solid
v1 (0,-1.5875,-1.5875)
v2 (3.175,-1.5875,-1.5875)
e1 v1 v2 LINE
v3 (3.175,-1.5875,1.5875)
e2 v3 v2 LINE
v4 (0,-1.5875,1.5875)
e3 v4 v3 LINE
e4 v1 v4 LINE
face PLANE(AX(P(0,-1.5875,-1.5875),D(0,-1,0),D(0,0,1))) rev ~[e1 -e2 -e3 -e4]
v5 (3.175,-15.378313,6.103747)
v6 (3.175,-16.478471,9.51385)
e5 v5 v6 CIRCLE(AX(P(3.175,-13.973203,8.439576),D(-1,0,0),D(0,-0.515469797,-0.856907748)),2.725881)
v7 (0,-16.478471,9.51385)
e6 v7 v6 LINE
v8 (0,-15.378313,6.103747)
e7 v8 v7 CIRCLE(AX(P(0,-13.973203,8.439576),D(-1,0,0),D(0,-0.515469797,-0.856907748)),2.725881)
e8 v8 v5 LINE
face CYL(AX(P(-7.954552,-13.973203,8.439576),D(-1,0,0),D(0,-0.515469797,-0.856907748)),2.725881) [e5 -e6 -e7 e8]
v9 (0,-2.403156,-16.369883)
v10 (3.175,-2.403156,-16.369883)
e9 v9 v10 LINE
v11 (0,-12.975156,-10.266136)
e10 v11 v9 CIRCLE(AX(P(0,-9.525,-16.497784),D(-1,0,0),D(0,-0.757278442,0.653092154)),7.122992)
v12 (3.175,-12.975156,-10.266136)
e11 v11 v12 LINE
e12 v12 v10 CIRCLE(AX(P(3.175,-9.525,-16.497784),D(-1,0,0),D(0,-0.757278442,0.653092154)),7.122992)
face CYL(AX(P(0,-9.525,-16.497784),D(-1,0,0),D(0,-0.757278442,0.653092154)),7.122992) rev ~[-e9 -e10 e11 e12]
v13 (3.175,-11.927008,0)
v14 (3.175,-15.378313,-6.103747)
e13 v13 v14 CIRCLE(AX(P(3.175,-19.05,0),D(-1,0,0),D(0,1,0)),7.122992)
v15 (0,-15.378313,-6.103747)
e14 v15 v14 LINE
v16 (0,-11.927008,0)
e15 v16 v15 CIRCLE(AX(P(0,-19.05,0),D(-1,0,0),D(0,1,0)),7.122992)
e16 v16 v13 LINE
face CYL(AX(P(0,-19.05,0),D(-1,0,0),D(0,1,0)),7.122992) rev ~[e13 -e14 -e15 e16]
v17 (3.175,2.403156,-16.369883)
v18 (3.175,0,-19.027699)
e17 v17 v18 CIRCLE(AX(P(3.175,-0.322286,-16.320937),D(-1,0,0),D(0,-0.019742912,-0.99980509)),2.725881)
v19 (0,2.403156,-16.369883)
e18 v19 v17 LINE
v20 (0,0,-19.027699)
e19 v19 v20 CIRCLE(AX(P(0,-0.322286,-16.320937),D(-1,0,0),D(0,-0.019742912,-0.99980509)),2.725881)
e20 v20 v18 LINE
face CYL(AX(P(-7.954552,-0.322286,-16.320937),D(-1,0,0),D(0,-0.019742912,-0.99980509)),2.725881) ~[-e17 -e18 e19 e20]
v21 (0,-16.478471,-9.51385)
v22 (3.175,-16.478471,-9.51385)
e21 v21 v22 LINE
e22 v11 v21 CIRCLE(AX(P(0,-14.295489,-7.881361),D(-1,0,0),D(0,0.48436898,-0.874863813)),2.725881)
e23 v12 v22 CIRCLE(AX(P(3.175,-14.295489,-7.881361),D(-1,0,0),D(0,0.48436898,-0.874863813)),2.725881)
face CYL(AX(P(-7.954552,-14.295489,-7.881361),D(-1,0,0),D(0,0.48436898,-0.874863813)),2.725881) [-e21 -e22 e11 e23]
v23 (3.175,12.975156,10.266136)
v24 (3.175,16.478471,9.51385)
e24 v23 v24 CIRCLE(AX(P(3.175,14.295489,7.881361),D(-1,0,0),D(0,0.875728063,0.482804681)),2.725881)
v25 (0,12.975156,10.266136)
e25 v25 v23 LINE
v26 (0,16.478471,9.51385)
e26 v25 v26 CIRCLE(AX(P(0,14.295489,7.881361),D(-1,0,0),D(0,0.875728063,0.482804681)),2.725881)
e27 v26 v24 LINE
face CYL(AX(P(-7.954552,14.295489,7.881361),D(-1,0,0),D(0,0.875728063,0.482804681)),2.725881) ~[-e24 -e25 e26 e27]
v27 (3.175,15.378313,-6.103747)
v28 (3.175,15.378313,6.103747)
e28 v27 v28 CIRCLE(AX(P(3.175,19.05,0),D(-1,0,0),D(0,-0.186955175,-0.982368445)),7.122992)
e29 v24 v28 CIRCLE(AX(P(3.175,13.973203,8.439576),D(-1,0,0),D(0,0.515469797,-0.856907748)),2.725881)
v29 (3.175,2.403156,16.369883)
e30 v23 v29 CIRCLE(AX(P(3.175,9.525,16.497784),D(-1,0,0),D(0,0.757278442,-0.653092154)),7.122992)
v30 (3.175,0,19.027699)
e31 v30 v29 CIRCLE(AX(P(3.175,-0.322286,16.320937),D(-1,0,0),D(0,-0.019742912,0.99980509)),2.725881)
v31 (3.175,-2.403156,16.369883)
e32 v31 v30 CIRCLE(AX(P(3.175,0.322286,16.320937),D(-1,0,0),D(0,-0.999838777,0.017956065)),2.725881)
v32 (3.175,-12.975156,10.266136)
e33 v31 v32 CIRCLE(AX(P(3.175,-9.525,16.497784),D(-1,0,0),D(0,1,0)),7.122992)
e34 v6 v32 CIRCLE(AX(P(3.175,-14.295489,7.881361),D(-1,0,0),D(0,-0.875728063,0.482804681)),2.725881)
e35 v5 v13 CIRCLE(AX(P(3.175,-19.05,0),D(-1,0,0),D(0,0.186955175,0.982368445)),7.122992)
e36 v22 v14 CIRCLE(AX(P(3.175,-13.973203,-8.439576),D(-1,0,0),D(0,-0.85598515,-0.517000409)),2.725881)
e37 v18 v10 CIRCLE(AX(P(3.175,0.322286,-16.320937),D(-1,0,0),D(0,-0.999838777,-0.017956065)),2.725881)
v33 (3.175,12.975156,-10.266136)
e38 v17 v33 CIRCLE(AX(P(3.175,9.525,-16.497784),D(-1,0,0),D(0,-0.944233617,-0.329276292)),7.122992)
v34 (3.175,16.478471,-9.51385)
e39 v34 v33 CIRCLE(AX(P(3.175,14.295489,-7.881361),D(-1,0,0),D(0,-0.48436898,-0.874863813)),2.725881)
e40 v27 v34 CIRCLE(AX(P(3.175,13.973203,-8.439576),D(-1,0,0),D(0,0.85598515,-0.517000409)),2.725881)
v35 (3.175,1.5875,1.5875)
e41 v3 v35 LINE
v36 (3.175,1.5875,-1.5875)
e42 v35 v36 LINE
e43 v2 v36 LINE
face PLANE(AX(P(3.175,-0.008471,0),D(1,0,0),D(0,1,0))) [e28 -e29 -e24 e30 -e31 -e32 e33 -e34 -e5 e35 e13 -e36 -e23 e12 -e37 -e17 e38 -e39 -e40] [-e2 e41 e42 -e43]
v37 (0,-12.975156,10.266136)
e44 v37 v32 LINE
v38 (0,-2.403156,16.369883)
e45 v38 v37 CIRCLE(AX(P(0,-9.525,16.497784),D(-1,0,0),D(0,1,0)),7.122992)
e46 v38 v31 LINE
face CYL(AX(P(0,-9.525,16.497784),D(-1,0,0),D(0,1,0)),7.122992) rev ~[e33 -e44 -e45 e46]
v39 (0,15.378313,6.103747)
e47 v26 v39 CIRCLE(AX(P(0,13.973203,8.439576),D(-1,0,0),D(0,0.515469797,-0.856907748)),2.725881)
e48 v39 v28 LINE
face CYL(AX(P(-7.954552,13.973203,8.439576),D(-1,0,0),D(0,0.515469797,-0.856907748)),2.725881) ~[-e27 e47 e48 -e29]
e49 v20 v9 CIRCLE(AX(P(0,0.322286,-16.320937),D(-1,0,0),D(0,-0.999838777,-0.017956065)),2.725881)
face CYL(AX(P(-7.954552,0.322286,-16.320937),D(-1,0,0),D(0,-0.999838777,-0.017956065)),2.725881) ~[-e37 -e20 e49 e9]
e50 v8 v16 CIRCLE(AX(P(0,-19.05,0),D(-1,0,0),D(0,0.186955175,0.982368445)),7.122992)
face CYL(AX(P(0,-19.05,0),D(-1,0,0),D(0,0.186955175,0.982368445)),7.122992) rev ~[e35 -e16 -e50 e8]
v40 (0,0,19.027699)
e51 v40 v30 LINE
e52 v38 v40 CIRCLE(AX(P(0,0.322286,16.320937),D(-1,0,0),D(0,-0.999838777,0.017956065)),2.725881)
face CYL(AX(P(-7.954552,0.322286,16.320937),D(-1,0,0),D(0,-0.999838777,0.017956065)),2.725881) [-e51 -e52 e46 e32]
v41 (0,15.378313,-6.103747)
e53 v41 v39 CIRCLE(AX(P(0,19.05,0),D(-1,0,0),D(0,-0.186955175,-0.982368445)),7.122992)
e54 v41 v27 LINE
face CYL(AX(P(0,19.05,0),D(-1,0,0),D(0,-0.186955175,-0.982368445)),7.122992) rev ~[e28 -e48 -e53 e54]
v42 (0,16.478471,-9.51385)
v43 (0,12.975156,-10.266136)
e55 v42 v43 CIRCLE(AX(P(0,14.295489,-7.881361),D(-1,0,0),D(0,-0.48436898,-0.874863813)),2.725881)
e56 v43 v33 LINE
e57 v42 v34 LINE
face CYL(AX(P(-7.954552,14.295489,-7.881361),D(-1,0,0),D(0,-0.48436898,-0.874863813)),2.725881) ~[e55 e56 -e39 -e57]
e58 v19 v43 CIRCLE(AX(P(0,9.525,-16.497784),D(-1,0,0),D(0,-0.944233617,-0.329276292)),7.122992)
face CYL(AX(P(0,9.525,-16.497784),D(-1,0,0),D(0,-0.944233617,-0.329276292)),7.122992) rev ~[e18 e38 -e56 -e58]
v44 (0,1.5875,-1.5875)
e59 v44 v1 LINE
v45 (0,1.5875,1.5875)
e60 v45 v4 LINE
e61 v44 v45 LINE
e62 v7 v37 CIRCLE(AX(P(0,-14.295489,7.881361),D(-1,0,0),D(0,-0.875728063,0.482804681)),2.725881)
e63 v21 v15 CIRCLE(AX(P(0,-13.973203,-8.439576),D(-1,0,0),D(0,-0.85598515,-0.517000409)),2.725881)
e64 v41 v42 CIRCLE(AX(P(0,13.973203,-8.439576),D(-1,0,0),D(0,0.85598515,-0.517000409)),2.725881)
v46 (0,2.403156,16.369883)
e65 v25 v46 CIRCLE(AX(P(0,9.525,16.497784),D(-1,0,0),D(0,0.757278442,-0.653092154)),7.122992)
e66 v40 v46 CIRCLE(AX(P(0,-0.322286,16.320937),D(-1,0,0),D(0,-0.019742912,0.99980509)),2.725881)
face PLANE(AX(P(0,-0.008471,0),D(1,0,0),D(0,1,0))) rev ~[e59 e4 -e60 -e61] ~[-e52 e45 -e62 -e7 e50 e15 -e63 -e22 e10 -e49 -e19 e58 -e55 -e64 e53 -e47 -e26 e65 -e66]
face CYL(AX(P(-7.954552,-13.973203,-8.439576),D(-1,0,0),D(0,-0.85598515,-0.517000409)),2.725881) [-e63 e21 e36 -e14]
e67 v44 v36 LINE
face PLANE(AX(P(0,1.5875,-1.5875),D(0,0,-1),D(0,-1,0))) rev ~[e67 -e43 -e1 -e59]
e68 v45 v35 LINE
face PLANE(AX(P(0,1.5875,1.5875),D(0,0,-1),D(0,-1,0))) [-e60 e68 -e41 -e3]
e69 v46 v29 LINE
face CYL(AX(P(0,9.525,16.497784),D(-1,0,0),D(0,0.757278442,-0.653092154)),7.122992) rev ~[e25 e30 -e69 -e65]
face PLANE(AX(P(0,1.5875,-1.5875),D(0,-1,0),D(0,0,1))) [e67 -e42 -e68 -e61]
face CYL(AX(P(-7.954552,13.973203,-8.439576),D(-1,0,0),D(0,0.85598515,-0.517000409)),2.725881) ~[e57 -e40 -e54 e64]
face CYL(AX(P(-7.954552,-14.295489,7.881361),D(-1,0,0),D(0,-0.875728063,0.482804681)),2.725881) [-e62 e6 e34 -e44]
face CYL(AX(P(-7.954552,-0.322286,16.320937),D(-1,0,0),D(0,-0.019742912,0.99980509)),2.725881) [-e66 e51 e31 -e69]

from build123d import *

# Parameters (mm, degrees)
F1_DEPTH    = 3.175
F2_W        = 3.175
F2_H        = 3.175
F3_DEPTH    = 25.4
F4_T1_DEPTH = 19.0841031127


# Not quite as in the source:
# - a fillet or chamfer that OpenCascade refuses, or shapes differently, is made with other operations: its cross-section is extruded or revolved along the edge and cut away or added


with BuildPart() as f1:
    # F0 (on Right) → F1 (new body)
    with BuildSketch(Plane.YZ):
        with BuildLine():
            ThreePointArc((17.7183197491, -6.9974027515), (11.9270078227, 0), (17.7183197491, 6.9974027515))
            ThreePointArc((17.7183197491, 6.9974027515), (16.4977839421, 9.525), (14.9190884179, 11.8458136394))
            ThreePointArc((14.9190884179, 11.8458136394), (5.9635039114, 10.3290917656), (2.7992313312, 18.8432163909))
            ThreePointArc((2.7992313312, 18.8432163909), (0, 19.05), (-2.7992313312, 18.8432163909))
            ThreePointArc((-2.7992313312, 18.8432163909), (-2.5020157635, 17.6871997533), (-2.4020078227, 16.4977839421))
            ThreePointArc((-2.4020078227, 16.4977839421), (-7.0435721899, 9.8209932773), (-14.9190884179, 11.8458136394))
            ThreePointArc((-14.9190884179, 11.8458136394), (-16.4977839421, 9.525), (-17.7183197491, 6.9974027515))
            ThreePointArc((-17.7183197491, 6.9974027515), (-13.5626251464, 4.5415564264), (-11.9270078227, 0))
            ThreePointArc((-11.9270078227, 0), (-13.5626251464, -4.5415564264), (-17.7183197491, -6.9974027515))
            ThreePointArc((-17.7183197491, -6.9974027515), (-16.4977839421, -9.525), (-14.9190884179, -11.8458136394))
            ThreePointArc((-14.9190884179, -11.8458136394), (-7.0435721899, -9.8209932773), (-2.4020078227, -16.4977839421))
            ThreePointArc((-2.4020078227, -16.4977839421), (-2.5020157635, -17.6871997533), (-2.7992313312, -18.8432163909))
            ThreePointArc((-2.7992313312, -18.8432163909), (0, -19.05), (2.7992313312, -18.8432163909))
            ThreePointArc((2.7992313312, -18.8432163909), (5.9635039114, -10.3290917656), (14.9190884179, -11.8458136394))
            ThreePointArc((14.9190884179, -11.8458136394), (16.4977839421, -9.525), (17.7183197491, -6.9974027515))
        make_face()
    extrude(amount=F1_DEPTH)

    # F2 (on face) → F3 (cut)
    with BuildSketch(Plane(origin=(0, 0, 0), x_dir=(0, -1, 0), z_dir=(-1, 0, 0))):
        Rectangle(F2_W, F2_H)
    extrude(amount=-F3_DEPTH, mode=Mode.SUBTRACT)

    # F4: fillet of radius 2.7258813335 on 12 edges, made by hand

    # F4_s2 → F4_t1 (cut)
    with BuildSketch(Plane.YZ.offset(-7.9545515563)):
        with BuildLine():
            ThreePointArc((-16.6826195947, 9.1974291766), (-15.0505041811, 10.5005937812), (-12.9751564545, 10.2661358457))
            ThreePointArc((-12.9751564545, 10.2661358457), (-14.0171055557, 10.9698543809), (-14.9190884179, 11.8458136394))
            ThreePointArc((-14.9190884179, 11.8458136394), (-15.8562439561, 10.5585049892), (-16.6826195947, 9.1974291766))
        make_face()
        with BuildLine():
            ThreePointArc((-15.3783126684, 6.1037471848), (-16.6190330599, 7.78382207), (-16.3065171138, 9.8488577824))
            ThreePointArc((-16.3065171138, 9.8488577824), (-17.0720555246, 8.45265758), (-17.7183197491, 6.9974027515))
            ThreePointArc((-17.7183197491, 6.9974027515), (-16.5087253475, 6.6542423084), (-15.3783126684, 6.1037471848))
        make_face()
        with BuildLine():
            ThreePointArc((-16.3065171138, -9.8488577824), (-16.6190330599, -7.78382207), (-15.3783126684, -6.1037471848))
            ThreePointArc((-15.3783126684, -6.1037471848), (-16.5087253475, -6.6542423084), (-17.7183197491, -6.9974027515))
            ThreePointArc((-17.7183197491, -6.9974027515), (-17.0720555246, -8.45265758), (-16.3065171138, -9.8488577824))
        make_face()
        with BuildLine():
            ThreePointArc((-12.9751564545, -10.2661358457), (-15.0505041811, -10.5005937812), (-16.6826195947, -9.1974291766))
            ThreePointArc((-16.6826195947, -9.1974291766), (-15.8562439561, -10.5585049892), (-14.9190884179, -11.8458136394))
            ThreePointArc((-14.9190884179, -11.8458136394), (-14.0171055557, -10.9698543809), (-12.9751564545, -10.2661358457))
        make_face()
        with BuildLine():
            ThreePointArc((-2.4031562138, -16.3698830306), (-1.5685288788, -18.2844158512), (0.3761024809, -19.046286959))
            ThreePointArc((0.3761024809, -19.046286959), (-1.2158115686, -19.0111625691), (-2.7992313312, -18.8432163909))
            ThreePointArc((-2.7992313312, -18.8432163909), (-2.4916197918, -17.6240966892), (-2.4031562138, -16.3698830306))
        make_face()
        with BuildLine():
            ThreePointArc((-2.4031562138, 16.3698830306), (-1.5685288788, 18.2844158512), (0.3761024809, 19.046286959))
            ThreePointArc((0.3761024809, 19.046286959), (-1.2158115686, 19.0111625691), (-2.7992313312, 18.8432163909))
            ThreePointArc((-2.7992313312, 18.8432163909), (-2.4916197918, 17.6240966892), (-2.4031562138, 16.3698830306))
        make_face()
        with BuildLine():
            ThreePointArc((16.6826195947, 9.1974291766), (15.0505041811, 10.5005937812), (12.9751564545, 10.2661358457))
            ThreePointArc((12.9751564545, 10.2661358457), (14.0171055557, 10.9698543809), (14.9190884179, 11.8458136394))
            ThreePointArc((14.9190884179, 11.8458136394), (15.8562439561, 10.5585049892), (16.6826195947, 9.1974291766))
        make_face()
        with BuildLine():
            ThreePointArc((-0.3761024809, 19.046286959), (1.5685288788, 18.2844158512), (2.4031562138, 16.3698830306))
            ThreePointArc((2.4031562138, 16.3698830306), (2.4916197918, 17.6240966892), (2.7992313312, 18.8432163909))
            ThreePointArc((2.7992313312, 18.8432163909), (1.2158115686, 19.0111625691), (-0.3761024809, 19.046286959))
        make_face()
        with BuildLine():
            ThreePointArc((15.3783126684, 6.1037471848), (16.6190330599, 7.78382207), (16.3065171138, 9.8488577824))
            ThreePointArc((16.3065171138, 9.8488577824), (17.0720555246, 8.45265758), (17.7183197491, 6.9974027515))
            ThreePointArc((17.7183197491, 6.9974027515), (16.5087253475, 6.6542423084), (15.3783126684, 6.1037471848))
        make_face()
        with BuildLine():
            ThreePointArc((16.3065171138, -9.8488577824), (16.6190330599, -7.78382207), (15.3783126684, -6.1037471848))
            ThreePointArc((15.3783126684, -6.1037471848), (16.5087253475, -6.6542423084), (17.7183197491, -6.9974027515))
            ThreePointArc((17.7183197491, -6.9974027515), (17.0720555246, -8.45265758), (16.3065171138, -9.8488577824))
        make_face()
        with BuildLine():
            ThreePointArc((12.9751564545, -10.2661358457), (15.0505041811, -10.5005937812), (16.6826195947, -9.1974291766))
            ThreePointArc((16.6826195947, -9.1974291766), (15.8562439561, -10.5585049892), (14.9190884179, -11.8458136394))
            ThreePointArc((14.9190884179, -11.8458136394), (14.0171055557, -10.9698543809), (12.9751564545, -10.2661358457))
        make_face()
        with BuildLine():
            ThreePointArc((-0.3761024809, -19.046286959), (1.5685288788, -18.2844158512), (2.4031562138, -16.3698830306))
            ThreePointArc((2.4031562138, -16.3698830306), (2.4916197918, -17.6240966892), (2.7992313312, -18.8432163909))
            ThreePointArc((2.7992313312, -18.8432163909), (1.2158115686, -19.0111625691), (-0.3761024809, -19.046286959))
        make_face()
    extrude(amount=F4_T1_DEPTH, mode=Mode.SUBTRACT)


solid = f1.part
